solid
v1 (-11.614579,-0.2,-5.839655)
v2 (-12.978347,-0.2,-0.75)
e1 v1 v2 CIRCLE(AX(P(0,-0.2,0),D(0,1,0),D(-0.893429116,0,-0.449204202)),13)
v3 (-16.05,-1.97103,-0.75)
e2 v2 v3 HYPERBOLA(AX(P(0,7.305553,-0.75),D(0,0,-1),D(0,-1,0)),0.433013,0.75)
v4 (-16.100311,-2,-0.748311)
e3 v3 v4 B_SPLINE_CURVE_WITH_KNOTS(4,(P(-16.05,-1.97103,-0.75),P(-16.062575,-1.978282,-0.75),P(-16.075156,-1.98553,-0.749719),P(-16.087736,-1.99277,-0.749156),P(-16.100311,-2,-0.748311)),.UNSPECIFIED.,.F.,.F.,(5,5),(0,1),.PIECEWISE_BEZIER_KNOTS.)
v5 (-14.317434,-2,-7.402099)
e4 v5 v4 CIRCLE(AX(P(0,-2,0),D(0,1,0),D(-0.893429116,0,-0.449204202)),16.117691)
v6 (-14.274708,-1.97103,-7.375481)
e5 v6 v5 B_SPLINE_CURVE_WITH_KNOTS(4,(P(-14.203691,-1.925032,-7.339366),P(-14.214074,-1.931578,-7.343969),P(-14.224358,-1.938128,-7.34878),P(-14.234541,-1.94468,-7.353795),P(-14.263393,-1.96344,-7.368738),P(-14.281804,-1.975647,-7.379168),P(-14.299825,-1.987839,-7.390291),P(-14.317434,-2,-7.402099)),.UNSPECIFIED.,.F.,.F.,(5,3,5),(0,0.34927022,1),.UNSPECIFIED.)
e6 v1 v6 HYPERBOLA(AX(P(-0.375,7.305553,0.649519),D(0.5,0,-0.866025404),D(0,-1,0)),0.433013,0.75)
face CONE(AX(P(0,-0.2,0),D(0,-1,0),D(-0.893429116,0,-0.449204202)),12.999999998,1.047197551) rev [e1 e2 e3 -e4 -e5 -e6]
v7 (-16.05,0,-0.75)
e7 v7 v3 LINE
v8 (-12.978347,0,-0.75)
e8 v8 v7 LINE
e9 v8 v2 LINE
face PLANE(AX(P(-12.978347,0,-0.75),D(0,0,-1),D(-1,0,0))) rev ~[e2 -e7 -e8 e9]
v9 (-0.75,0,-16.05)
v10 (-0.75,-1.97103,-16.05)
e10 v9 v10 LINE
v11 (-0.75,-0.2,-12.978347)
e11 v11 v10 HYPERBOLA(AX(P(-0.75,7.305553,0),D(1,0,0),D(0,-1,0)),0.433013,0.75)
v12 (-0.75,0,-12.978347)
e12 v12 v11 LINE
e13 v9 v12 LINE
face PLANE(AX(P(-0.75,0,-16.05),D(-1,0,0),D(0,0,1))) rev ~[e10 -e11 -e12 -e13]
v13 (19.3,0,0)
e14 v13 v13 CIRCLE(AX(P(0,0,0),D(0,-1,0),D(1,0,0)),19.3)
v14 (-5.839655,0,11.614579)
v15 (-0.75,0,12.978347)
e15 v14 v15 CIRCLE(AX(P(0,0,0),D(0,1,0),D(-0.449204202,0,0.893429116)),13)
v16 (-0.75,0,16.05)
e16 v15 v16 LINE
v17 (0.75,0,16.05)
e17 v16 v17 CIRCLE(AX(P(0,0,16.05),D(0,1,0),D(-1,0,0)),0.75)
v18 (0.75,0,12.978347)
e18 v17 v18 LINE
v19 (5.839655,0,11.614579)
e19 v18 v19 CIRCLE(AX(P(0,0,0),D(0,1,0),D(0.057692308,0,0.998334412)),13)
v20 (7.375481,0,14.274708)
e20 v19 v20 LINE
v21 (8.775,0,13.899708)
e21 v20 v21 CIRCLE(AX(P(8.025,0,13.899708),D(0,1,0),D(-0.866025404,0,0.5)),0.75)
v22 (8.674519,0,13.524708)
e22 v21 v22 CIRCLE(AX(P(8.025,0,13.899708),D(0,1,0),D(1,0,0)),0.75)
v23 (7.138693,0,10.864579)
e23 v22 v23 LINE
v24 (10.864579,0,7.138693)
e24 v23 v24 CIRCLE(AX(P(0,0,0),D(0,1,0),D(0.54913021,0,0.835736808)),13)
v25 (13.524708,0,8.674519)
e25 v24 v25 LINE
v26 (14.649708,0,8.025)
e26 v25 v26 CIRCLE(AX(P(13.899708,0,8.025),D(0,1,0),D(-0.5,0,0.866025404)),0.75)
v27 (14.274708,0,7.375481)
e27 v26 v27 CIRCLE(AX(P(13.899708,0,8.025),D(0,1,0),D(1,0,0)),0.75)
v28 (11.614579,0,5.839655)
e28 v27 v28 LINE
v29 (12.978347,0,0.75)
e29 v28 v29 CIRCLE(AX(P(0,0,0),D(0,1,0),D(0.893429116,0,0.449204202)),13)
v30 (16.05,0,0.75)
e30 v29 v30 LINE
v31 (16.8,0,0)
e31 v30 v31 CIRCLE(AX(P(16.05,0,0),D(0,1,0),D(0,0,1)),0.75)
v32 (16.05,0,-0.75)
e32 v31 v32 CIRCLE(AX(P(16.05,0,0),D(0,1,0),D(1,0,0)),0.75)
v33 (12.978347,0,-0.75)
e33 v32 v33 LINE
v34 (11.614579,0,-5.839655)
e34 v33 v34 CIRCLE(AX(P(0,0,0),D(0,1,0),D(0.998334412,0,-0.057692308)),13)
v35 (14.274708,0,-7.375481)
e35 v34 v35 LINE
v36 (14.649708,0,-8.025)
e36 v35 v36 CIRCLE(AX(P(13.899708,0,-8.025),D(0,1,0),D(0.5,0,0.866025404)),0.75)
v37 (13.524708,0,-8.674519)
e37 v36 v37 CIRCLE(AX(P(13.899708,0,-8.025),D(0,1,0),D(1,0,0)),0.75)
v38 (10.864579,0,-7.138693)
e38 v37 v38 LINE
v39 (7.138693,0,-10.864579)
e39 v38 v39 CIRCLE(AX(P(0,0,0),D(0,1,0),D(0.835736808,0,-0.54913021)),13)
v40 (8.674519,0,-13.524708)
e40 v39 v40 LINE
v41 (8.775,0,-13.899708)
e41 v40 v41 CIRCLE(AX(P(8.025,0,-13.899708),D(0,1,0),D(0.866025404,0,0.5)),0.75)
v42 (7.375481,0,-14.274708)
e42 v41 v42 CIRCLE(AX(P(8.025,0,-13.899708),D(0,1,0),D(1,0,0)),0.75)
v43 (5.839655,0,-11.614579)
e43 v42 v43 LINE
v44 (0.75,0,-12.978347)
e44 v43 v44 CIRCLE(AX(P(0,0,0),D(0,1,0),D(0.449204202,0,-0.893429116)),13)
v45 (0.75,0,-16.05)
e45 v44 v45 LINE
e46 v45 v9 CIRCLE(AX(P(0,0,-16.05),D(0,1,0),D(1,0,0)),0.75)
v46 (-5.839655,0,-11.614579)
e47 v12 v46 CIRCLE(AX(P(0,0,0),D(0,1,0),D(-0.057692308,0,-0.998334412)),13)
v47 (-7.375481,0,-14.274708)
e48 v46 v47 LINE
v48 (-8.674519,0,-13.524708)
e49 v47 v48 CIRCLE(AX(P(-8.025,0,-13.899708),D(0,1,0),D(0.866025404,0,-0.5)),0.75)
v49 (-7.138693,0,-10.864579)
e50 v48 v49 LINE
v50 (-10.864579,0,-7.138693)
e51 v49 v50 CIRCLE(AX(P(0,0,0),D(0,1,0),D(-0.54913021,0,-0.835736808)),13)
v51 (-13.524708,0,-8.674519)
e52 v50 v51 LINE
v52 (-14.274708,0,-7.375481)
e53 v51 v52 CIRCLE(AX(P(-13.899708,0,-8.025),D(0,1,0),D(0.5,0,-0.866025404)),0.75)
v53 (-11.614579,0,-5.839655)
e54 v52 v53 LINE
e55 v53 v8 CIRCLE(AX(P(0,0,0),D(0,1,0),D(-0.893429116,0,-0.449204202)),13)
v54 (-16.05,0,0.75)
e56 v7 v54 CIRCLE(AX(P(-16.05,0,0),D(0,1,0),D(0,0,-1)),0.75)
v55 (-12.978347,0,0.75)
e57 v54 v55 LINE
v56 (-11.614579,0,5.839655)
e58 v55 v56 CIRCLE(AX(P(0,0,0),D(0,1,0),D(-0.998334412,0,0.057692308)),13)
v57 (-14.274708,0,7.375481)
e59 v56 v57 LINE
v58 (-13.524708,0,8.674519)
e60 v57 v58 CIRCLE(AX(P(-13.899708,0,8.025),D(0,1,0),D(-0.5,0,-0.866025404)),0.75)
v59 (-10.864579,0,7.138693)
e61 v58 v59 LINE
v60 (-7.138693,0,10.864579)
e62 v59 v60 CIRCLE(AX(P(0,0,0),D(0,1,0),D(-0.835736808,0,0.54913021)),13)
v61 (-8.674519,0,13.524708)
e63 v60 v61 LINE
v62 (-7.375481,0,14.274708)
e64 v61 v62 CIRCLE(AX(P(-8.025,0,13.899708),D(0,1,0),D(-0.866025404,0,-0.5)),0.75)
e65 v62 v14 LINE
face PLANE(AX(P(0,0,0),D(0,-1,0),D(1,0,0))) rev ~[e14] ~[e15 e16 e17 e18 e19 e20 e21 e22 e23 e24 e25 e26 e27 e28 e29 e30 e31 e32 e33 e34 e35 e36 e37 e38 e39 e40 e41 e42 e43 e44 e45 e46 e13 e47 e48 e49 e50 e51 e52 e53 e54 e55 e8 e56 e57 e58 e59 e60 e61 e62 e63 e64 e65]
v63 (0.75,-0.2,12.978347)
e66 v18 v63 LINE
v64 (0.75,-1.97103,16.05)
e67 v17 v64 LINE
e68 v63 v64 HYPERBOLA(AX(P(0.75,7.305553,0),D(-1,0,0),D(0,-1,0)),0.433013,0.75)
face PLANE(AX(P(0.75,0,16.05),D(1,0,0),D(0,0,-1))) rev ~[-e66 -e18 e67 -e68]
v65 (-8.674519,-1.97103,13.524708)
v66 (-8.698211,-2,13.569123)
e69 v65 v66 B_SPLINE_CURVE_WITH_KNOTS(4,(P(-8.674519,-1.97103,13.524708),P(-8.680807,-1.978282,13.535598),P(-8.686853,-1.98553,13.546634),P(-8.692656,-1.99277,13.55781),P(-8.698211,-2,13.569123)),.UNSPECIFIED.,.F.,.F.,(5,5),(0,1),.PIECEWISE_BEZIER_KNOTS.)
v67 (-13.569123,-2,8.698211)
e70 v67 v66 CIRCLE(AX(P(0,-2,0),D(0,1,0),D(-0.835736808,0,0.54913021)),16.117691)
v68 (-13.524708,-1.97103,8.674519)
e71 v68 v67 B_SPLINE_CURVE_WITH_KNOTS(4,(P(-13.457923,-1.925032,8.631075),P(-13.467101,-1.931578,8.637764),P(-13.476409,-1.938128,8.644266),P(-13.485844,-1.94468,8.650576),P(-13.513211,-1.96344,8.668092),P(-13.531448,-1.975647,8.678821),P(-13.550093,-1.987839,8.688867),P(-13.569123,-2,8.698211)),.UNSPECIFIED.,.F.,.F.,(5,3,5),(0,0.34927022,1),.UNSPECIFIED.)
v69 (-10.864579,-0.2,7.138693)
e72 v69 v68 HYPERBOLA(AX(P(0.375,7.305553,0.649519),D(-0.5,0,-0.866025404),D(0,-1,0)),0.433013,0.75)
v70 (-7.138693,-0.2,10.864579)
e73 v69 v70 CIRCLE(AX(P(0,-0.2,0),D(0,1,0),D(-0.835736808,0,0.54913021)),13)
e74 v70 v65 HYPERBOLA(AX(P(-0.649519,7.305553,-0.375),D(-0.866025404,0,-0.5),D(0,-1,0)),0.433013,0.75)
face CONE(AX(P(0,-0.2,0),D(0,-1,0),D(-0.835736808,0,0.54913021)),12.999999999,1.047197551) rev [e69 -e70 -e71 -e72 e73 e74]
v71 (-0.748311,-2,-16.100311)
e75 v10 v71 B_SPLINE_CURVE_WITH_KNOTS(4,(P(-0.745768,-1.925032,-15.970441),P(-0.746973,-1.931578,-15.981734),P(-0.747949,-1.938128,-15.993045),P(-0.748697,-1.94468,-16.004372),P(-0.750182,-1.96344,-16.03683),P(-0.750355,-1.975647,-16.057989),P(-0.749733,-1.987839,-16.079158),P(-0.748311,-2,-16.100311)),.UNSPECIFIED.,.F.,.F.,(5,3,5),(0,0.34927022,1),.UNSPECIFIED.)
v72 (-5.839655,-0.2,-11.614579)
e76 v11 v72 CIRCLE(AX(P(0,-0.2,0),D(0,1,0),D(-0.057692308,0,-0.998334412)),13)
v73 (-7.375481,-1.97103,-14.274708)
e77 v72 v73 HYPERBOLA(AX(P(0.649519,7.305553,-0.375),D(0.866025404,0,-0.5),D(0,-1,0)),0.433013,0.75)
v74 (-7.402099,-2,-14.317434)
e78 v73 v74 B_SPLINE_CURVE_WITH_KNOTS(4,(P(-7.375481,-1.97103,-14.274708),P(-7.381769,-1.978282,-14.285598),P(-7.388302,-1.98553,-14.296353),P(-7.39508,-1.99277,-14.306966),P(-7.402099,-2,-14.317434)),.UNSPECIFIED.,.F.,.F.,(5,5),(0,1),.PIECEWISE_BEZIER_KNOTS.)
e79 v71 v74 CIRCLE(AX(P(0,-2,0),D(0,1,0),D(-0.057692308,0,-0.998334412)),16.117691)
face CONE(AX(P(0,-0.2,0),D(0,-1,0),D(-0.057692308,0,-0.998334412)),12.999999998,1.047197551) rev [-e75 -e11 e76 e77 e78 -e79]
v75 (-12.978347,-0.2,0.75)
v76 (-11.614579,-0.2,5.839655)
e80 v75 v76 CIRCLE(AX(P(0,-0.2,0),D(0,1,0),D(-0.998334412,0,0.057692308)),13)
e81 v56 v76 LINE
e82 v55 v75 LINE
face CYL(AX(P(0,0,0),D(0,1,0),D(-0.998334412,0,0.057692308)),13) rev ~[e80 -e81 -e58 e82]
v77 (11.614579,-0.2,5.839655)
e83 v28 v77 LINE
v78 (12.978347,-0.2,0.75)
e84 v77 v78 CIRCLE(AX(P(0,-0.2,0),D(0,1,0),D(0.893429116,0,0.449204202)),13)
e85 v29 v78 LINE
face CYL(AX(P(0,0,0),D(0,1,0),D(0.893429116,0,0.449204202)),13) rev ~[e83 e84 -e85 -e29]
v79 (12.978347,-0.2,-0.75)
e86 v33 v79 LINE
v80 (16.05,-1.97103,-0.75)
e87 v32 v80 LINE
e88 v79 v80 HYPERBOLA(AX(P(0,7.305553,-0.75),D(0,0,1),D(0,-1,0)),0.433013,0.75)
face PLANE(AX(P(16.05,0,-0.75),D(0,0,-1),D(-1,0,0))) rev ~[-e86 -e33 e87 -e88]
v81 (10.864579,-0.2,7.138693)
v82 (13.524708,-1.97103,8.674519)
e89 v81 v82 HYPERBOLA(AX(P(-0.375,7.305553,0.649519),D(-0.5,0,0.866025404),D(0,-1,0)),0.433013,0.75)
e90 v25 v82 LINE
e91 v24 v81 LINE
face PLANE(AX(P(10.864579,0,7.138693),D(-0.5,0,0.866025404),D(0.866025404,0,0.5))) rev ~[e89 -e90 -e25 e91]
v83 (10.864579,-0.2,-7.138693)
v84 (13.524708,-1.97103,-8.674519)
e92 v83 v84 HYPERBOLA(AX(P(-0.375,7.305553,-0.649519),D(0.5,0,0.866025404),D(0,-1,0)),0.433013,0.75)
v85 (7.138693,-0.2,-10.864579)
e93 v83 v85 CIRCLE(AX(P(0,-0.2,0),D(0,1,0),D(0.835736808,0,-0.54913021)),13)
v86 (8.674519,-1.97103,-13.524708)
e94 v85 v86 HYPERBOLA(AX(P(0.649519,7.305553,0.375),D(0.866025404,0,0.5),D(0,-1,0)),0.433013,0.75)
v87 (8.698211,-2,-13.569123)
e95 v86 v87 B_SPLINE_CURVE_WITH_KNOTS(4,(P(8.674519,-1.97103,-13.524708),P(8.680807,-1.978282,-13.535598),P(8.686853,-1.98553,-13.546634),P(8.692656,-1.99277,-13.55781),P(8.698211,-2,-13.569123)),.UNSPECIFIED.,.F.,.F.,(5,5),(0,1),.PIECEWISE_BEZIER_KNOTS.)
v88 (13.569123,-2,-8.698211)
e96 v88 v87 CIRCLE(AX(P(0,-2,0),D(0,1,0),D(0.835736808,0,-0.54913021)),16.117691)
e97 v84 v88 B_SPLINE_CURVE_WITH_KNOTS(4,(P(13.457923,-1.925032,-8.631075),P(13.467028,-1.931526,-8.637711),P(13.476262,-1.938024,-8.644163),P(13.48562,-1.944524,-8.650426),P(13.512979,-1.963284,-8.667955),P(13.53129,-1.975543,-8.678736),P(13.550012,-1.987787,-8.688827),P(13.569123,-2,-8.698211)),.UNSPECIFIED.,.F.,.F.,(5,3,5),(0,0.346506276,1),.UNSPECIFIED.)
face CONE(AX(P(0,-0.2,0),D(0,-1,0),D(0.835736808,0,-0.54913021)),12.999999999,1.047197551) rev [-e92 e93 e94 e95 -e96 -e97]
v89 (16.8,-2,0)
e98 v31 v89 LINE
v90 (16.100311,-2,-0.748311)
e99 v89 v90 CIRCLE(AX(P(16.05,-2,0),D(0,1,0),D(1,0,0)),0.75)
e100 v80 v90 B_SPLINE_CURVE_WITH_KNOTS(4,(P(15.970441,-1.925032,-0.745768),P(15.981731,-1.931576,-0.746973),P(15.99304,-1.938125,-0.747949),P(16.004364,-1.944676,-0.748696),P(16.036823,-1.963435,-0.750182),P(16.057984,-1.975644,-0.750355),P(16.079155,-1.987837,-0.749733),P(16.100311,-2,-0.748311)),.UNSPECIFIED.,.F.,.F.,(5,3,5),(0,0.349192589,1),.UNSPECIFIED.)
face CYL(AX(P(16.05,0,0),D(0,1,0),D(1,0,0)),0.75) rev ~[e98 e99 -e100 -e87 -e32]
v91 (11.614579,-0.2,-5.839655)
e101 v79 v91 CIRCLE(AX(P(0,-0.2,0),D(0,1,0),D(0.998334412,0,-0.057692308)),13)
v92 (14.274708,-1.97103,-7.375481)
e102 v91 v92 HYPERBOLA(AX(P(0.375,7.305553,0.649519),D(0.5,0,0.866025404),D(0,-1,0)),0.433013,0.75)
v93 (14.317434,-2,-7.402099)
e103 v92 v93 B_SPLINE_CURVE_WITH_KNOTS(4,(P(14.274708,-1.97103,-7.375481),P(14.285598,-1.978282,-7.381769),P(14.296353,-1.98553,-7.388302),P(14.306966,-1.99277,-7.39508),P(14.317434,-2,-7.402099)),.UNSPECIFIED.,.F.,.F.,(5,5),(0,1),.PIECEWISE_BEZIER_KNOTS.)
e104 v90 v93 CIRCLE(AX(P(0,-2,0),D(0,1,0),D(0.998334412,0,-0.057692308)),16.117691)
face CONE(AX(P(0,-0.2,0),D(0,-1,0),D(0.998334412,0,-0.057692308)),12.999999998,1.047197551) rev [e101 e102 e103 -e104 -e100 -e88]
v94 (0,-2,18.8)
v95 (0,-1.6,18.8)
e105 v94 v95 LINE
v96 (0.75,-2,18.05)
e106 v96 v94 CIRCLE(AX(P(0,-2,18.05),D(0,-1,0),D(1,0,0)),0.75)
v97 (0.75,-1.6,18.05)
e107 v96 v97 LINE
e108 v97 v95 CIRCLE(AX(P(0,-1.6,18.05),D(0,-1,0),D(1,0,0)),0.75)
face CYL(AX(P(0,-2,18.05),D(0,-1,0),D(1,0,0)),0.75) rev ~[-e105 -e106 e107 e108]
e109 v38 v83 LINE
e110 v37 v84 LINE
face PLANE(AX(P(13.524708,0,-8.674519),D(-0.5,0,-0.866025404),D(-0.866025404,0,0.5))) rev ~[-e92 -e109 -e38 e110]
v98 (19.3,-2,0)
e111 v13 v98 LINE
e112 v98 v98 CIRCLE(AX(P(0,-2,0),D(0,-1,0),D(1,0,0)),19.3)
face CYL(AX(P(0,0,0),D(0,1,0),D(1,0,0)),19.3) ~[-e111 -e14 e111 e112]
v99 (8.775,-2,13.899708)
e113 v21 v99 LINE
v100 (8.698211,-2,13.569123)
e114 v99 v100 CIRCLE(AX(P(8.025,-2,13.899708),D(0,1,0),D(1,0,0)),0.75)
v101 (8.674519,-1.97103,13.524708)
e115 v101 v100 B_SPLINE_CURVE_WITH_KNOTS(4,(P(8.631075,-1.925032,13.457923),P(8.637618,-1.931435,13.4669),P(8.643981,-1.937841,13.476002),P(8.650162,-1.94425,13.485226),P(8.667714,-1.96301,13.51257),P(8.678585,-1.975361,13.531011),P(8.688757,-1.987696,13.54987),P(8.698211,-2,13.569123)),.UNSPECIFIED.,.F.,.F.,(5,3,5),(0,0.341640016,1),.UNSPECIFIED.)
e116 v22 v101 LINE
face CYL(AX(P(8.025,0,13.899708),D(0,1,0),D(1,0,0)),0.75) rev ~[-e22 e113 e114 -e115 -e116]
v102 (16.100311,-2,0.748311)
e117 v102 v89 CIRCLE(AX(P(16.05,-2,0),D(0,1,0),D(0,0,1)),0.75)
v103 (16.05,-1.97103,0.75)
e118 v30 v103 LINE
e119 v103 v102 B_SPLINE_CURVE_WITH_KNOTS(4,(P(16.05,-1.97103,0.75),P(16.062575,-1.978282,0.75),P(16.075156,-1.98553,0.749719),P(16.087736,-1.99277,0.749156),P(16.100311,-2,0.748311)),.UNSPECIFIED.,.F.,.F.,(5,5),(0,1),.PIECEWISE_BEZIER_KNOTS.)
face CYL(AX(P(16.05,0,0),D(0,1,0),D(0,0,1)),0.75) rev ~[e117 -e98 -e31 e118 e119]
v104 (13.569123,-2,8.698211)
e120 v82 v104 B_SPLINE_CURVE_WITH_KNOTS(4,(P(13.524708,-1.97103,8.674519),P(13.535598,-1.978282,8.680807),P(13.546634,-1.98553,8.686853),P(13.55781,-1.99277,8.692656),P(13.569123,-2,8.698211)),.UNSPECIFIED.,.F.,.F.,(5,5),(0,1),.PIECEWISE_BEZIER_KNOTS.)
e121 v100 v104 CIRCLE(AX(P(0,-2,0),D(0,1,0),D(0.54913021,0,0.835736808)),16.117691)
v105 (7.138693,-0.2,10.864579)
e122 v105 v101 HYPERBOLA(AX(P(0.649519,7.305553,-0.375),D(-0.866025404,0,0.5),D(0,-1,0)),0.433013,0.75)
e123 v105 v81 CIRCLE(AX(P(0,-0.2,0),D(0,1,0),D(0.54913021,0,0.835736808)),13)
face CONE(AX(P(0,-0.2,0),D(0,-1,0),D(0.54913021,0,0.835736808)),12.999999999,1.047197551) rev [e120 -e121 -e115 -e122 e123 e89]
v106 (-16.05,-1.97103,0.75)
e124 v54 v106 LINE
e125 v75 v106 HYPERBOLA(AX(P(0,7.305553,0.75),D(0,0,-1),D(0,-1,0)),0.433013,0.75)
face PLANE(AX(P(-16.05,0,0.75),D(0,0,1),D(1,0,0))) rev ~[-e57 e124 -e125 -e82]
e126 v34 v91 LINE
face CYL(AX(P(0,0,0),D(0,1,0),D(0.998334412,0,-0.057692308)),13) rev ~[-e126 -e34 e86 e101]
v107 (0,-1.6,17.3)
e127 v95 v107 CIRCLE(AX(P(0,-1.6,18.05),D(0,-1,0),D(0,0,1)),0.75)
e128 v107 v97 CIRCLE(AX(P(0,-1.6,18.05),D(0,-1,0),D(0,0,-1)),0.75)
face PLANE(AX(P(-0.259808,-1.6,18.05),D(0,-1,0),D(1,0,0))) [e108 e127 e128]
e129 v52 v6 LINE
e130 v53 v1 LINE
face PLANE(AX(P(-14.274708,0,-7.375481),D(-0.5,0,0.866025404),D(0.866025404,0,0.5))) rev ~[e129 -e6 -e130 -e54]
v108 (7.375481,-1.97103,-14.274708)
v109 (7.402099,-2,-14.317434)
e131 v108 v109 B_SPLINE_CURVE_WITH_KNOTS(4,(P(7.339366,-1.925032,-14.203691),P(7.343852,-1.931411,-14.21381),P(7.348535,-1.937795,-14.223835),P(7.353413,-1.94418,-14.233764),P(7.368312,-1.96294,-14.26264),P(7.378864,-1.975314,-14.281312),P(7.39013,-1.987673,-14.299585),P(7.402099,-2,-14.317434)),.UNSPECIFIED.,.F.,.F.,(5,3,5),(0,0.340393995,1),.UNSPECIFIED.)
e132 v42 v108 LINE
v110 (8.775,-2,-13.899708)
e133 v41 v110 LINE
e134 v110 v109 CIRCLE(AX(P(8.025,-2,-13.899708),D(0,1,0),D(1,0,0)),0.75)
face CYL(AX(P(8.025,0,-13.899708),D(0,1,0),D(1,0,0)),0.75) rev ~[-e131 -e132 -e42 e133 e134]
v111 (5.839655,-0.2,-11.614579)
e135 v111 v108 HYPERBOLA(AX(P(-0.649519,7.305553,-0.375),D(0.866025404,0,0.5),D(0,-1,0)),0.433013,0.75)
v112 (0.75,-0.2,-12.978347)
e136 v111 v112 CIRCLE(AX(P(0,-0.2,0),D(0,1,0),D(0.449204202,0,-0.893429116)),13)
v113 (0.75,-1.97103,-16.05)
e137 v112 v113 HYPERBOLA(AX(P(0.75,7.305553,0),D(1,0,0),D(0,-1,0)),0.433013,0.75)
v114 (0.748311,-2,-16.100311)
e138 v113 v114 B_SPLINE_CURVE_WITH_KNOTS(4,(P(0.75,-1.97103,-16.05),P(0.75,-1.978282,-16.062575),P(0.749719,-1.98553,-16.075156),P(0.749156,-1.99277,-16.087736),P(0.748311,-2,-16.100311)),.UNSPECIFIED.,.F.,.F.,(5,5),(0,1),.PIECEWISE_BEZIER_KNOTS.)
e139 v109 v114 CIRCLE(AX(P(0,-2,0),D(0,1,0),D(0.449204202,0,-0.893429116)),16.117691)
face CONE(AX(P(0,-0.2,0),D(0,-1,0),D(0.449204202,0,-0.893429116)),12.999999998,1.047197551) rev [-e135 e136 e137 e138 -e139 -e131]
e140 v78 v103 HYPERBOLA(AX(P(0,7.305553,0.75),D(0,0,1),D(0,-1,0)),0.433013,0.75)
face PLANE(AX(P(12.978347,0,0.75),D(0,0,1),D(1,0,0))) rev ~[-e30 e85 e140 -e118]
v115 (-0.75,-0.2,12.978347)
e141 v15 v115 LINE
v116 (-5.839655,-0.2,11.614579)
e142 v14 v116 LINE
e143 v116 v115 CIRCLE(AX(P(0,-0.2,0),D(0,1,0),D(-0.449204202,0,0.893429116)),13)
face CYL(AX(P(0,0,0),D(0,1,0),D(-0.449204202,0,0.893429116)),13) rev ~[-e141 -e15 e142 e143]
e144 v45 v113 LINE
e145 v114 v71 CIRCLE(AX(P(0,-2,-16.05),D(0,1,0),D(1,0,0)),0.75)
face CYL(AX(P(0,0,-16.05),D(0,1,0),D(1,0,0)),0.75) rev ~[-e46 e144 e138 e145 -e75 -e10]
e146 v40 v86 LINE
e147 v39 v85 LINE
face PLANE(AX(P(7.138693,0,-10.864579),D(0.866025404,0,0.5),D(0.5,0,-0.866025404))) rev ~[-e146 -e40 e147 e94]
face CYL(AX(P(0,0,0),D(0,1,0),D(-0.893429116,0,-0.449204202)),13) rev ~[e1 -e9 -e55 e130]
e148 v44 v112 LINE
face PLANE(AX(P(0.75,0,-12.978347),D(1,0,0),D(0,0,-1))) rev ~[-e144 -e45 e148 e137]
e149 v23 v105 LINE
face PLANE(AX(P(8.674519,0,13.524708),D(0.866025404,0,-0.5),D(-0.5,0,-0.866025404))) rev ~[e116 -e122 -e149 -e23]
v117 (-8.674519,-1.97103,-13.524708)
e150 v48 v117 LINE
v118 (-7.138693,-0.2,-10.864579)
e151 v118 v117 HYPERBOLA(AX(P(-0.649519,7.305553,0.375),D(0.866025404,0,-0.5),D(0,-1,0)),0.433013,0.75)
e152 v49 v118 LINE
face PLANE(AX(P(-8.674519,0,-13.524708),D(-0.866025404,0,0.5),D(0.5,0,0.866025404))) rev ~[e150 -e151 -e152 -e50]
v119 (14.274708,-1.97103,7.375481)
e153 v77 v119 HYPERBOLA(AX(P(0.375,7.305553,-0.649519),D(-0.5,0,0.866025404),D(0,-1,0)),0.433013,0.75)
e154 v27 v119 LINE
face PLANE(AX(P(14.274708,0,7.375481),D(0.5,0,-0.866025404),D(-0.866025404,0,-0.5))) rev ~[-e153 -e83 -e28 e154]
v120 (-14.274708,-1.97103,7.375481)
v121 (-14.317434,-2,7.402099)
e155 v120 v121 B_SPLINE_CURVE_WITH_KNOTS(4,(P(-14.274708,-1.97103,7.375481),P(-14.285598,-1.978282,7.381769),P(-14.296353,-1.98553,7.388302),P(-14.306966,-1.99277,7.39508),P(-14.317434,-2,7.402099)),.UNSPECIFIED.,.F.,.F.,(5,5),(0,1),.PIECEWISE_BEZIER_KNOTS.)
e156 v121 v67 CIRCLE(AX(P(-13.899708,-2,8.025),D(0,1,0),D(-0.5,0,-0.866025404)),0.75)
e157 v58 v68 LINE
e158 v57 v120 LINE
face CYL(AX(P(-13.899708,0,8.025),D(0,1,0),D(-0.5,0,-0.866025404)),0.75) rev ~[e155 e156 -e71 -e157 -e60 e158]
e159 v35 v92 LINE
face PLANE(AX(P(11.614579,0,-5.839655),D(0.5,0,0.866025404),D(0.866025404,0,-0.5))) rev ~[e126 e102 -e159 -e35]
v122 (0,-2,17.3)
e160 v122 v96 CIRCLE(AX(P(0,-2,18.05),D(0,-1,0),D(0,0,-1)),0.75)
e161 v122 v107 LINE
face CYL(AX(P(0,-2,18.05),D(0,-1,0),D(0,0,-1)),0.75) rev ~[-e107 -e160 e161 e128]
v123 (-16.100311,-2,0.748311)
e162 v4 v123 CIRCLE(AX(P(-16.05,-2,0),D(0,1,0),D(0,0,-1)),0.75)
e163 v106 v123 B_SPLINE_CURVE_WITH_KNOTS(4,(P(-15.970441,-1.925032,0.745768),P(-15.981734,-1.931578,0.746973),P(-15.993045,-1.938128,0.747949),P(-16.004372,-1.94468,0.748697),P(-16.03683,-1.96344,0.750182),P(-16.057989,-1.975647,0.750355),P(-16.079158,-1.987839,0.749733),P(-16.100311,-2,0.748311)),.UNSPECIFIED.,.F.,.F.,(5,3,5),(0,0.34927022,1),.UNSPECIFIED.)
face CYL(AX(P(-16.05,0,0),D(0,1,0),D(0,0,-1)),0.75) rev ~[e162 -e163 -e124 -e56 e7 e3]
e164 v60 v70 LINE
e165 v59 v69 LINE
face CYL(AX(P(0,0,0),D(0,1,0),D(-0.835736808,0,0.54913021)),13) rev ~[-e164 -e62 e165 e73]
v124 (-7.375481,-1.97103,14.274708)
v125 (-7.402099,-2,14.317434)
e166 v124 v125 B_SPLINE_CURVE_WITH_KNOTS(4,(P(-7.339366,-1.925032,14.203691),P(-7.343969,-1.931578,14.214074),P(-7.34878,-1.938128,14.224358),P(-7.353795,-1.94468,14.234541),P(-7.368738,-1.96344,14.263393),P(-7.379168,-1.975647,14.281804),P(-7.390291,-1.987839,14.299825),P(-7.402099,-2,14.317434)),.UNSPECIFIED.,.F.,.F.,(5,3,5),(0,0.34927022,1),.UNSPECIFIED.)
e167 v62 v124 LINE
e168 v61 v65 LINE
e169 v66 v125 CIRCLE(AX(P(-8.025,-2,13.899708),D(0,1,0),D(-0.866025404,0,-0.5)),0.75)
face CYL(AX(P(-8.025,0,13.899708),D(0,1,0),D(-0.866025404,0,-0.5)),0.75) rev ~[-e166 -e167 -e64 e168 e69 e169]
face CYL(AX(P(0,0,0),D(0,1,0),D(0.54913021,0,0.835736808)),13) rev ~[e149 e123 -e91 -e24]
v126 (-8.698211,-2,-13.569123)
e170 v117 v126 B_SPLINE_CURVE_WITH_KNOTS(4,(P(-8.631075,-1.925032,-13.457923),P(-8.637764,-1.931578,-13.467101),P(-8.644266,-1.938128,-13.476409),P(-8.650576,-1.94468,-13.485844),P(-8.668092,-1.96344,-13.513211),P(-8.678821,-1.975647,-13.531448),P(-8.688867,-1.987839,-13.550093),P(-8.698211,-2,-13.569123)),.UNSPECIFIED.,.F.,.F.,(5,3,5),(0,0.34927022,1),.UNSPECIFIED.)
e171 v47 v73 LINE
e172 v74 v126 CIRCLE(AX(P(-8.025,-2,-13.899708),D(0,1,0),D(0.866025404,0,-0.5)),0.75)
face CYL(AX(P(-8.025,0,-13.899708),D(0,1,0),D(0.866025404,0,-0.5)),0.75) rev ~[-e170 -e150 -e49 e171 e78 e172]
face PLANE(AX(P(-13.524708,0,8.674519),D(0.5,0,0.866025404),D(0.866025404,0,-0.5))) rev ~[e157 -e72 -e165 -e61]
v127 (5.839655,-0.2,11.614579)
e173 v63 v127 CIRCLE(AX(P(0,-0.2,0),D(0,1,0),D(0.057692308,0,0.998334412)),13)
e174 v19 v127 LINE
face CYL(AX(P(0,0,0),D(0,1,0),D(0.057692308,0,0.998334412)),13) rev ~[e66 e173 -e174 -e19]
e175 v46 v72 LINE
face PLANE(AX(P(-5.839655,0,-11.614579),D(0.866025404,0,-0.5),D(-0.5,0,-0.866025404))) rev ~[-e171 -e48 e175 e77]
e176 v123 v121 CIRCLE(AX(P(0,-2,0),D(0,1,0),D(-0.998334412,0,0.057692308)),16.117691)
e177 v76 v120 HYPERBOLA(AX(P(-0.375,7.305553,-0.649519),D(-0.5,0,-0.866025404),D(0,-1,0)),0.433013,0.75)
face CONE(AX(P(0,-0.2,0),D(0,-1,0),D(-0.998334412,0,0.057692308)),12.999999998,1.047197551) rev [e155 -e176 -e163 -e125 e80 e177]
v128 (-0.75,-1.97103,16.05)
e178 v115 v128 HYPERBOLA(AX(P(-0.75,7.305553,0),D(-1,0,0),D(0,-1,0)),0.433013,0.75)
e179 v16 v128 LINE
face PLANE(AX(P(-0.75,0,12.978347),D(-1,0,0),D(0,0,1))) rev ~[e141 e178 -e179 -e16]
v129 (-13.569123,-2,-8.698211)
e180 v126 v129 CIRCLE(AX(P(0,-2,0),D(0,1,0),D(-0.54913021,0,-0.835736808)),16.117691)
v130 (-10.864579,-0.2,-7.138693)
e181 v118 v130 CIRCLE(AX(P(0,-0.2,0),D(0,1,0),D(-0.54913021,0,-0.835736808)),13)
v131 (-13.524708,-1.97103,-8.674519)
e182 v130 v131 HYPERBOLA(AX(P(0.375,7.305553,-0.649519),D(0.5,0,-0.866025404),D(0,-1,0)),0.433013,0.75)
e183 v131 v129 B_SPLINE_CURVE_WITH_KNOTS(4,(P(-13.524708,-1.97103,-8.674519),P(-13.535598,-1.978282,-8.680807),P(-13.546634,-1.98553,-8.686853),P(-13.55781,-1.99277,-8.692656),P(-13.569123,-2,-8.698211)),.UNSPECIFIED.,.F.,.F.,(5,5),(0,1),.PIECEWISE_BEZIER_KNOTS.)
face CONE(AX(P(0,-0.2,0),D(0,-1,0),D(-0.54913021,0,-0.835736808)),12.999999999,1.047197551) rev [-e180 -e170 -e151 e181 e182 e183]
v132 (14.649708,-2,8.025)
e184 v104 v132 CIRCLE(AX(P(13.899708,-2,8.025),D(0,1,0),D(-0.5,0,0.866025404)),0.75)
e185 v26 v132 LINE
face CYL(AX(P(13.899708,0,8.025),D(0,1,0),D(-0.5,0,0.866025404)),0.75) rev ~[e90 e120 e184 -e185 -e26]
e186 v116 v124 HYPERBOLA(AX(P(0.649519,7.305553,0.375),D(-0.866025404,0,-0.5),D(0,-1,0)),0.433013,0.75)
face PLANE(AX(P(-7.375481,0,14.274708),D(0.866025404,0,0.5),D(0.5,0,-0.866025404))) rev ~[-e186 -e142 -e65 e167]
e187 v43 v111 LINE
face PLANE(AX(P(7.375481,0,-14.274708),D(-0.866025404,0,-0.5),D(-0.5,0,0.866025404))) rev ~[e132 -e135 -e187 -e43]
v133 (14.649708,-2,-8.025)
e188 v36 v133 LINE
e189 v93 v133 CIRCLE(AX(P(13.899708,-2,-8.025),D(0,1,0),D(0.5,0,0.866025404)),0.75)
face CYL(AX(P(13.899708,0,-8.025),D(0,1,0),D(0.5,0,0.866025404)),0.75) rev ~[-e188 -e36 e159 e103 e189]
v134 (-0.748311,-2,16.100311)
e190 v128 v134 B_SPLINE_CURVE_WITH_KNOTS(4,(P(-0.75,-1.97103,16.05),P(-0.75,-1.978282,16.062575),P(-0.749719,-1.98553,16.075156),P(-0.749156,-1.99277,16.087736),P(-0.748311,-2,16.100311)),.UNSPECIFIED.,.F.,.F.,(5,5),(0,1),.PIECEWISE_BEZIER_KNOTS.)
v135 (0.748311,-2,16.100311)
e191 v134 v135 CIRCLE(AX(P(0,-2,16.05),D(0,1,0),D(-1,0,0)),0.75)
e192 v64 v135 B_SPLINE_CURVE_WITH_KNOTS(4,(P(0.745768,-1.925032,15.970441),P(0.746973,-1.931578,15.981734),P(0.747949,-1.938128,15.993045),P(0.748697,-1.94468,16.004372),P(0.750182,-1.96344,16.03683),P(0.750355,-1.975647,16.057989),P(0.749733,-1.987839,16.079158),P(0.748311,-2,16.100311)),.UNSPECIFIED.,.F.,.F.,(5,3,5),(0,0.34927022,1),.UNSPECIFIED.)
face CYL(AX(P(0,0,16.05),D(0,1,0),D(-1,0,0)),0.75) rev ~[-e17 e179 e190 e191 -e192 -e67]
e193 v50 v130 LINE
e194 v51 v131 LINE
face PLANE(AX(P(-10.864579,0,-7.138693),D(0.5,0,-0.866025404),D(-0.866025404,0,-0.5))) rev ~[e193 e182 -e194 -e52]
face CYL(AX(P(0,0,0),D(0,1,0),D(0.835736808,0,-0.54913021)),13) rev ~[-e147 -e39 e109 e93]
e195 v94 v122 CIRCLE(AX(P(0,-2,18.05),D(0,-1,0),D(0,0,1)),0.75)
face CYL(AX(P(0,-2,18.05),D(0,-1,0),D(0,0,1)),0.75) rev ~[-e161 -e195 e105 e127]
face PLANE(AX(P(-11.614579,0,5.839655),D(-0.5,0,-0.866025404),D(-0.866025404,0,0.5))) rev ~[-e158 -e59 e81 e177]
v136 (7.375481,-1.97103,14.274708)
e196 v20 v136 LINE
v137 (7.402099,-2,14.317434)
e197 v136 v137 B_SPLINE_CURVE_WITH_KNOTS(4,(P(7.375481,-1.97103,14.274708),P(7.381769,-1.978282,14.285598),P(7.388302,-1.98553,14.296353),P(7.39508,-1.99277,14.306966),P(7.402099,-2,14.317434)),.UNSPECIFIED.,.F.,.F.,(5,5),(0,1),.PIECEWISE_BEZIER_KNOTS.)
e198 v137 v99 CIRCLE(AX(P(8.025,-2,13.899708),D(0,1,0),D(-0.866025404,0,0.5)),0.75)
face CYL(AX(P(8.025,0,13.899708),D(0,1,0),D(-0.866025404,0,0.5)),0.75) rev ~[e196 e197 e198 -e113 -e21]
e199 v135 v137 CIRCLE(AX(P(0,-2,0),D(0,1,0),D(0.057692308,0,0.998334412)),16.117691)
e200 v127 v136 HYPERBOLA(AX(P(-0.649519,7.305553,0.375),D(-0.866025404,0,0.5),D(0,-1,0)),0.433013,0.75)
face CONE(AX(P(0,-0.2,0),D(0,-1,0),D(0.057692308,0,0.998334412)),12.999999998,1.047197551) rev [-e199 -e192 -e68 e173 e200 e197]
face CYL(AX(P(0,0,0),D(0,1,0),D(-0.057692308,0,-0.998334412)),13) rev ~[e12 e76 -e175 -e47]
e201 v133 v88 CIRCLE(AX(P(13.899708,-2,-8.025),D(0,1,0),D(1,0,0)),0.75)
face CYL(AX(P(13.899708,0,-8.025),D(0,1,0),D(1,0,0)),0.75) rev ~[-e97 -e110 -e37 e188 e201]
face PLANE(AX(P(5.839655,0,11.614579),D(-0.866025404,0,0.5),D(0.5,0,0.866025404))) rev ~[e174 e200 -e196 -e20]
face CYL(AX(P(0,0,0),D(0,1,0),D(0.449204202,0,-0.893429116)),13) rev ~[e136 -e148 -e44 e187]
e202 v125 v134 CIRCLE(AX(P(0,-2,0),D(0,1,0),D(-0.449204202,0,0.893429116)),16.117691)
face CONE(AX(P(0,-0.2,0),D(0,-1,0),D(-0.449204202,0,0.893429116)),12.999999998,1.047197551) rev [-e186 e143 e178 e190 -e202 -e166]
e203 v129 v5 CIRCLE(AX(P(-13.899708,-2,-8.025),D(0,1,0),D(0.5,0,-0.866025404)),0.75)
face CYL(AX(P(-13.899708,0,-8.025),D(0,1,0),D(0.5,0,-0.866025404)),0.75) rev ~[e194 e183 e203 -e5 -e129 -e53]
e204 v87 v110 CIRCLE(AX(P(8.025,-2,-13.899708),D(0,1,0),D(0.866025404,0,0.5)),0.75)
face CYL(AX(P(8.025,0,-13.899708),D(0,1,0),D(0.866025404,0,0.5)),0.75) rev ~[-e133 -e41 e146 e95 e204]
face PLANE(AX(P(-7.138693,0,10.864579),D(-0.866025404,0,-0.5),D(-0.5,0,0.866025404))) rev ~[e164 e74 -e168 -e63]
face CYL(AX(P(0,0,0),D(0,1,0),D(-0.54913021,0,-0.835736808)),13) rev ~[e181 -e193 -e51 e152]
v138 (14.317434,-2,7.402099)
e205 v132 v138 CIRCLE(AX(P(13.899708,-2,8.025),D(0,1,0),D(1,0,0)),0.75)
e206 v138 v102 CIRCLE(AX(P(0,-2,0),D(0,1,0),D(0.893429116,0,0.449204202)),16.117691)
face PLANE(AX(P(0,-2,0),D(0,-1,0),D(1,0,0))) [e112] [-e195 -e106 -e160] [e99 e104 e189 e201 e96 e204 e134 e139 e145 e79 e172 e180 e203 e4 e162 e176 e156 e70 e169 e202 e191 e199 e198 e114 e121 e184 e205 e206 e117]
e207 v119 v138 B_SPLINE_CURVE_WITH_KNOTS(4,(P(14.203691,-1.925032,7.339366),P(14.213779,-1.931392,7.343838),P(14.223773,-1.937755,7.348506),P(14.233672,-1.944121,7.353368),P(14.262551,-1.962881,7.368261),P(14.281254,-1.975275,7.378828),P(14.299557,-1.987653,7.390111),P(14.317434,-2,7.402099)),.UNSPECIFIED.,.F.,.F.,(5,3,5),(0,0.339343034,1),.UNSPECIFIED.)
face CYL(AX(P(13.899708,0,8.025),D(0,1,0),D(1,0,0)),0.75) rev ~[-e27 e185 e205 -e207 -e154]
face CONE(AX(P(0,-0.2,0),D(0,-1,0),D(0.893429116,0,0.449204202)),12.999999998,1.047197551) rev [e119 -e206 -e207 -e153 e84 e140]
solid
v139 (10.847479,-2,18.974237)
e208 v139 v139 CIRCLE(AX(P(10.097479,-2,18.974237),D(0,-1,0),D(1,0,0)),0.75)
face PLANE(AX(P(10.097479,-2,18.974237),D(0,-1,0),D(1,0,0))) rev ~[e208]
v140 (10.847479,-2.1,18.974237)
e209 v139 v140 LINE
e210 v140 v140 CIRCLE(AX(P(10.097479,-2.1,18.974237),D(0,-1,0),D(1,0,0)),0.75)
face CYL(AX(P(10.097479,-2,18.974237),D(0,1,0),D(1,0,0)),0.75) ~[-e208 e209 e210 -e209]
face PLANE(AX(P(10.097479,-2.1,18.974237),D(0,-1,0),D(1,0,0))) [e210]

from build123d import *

# Parameters (mm, degrees)
F0_R        = 19.3
F1_DEPTH    = 2
F2_SIZE2    = 3.1176914536
F2_SIZE     = 1.8
F2_2_SIZE2  = 3.1176914536
F2_2_SIZE   = 1.8
F2_3_SIZE2  = 3.1176914536
F2_3_SIZE   = 1.8
F2_4_SIZE2  = 3.1176914536
F2_4_SIZE   = 1.8
F2_5_SIZE2  = 3.1176914536
F2_5_SIZE   = 1.8
F2_6_SIZE2  = 3.1176914536
F2_6_SIZE   = 1.8
F2_7_SIZE2  = 3.1176914536
F2_7_SIZE   = 1.8
F2_8_SIZE2  = 3.1176914536
F2_8_SIZE   = 1.8
F2_9_SIZE2  = 3.1176914536
F2_9_SIZE   = 1.8
F2_10_SIZE2 = 3.1176914536
F2_10_SIZE  = 1.8
F2_11_SIZE2 = 3.1176914536
F2_11_SIZE  = 1.8
F2_12_SIZE2 = 3.1176914536
F2_12_SIZE  = 1.8
F4_DEPTH    = 0.4
F3_R        = 0.75
F5_DEPTH    = 0.1


# Not quite as in the source:
# - a feature names something its author has since deleted; it is built from what else it names


with BuildPart() as f1:
    # F0 (on Front) → F1 (new body)
    with BuildSketch(Plane.XZ):
        Circle(F0_R)
        with BuildLine():
            ThreePointArc((-16.05, -0.75), (-16.8, 0), (-16.05, 0.75))
            Line((-16.05, 0.75), (-12.9783473524, 0.75))
            ThreePointArc((-12.9783473524, 0.75), (-12.5570357418, 3.3646475863), (-11.6145785063, 5.8396546234))
            Line((-11.6145785063, 5.8396546234), (-14.2747077307, 7.3754809472))
            ThreePointArc((-14.2747077307, 7.3754809472), (-14.5492267836, 8.4), (-13.5247077307, 8.6745190528))
            Line((-13.5247077307, 8.6745190528), (-10.8645785063, 7.138692729))
            ThreePointArc((-10.8645785063, 7.138692729), (-9.1923881554, 9.1923881554), (-7.138692729, 10.8645785063))
            Line((-7.138692729, 10.8645785063), (-8.6745190528, 13.5247077307))
            ThreePointArc((-8.6745190528, 13.5247077307), (-8.4, 14.5492267836), (-7.3754809472, 14.2747077307))
            Line((-7.3754809472, 14.2747077307), (-5.8396546234, 11.6145785063))
            ThreePointArc((-5.8396546234, 11.6145785063), (-3.3646475863, 12.5570357418), (-0.75, 12.9783473524))
            Line((-0.75, 12.9783473524), (-0.75, 16.05))
            ThreePointArc((-0.75, 16.05), (0, 16.8), (0.75, 16.05))
            Line((0.75, 16.05), (0.75, 12.9783473524))
            ThreePointArc((0.75, 12.9783473524), (3.3646475863, 12.5570357418), (5.8396546234, 11.6145785063))
            Line((5.8396546234, 11.6145785063), (7.3754809472, 14.2747077307))
            ThreePointArc((7.3754809472, 14.2747077307), (8.2191142838, 14.6241521005), (8.775, 13.8997077307))
            ThreePointArc((8.775, 13.8997077307), (8.7494443697, 13.7055934469), (8.6745190528, 13.5247077307))
            Line((8.6745190528, 13.5247077307), (7.138692729, 10.8645785063))
            ThreePointArc((7.138692729, 10.8645785063), (9.1923881554, 9.1923881554), (10.8645785063, 7.138692729))
            Line((10.8645785063, 7.138692729), (13.5247077307, 8.6745190528))
            ThreePointArc((13.5247077307, 8.6745190528), (14.2747077307, 8.6745190528), (14.6497077307, 8.025))
            ThreePointArc((14.6497077307, 8.025), (14.5492267836, 7.65), (14.2747077307, 7.3754809472))
            Line((14.2747077307, 7.3754809472), (11.6145785063, 5.8396546234))
            ThreePointArc((11.6145785063, 5.8396546234), (12.5570357418, 3.3646475863), (12.9783473524, 0.75))
            Line((12.9783473524, 0.75), (16.05, 0.75))
            ThreePointArc((16.05, 0.75), (16.5803300859, 0.5303300859), (16.8, 0))
            ThreePointArc((16.8, 0), (16.5803300859, -0.5303300859), (16.05, -0.75))
            Line((16.05, -0.75), (12.9783473524, -0.75))
            ThreePointArc((12.9783473524, -0.75), (12.5570357418, -3.3646475863), (11.6145785063, -5.8396546234))
            Line((11.6145785063, -5.8396546234), (14.2747077307, -7.3754809472))
            ThreePointArc((14.2747077307, -7.3754809472), (14.5492267836, -7.65), (14.6497077307, -8.025))
            ThreePointArc((14.6497077307, -8.025), (14.2747077307, -8.6745190528), (13.5247077307, -8.6745190528))
            Line((13.5247077307, -8.6745190528), (10.8645785063, -7.138692729))
            ThreePointArc((10.8645785063, -7.138692729), (9.1923881554, -9.1923881554), (7.138692729, -10.8645785063))
            Line((7.138692729, -10.8645785063), (8.6745190528, -13.5247077307))
            ThreePointArc((8.6745190528, -13.5247077307), (8.7494443697, -13.7055934469), (8.775, -13.8997077307))
            ThreePointArc((8.775, -13.8997077307), (8.2191142838, -14.6241521005), (7.3754809472, -14.2747077307))
            Line((7.3754809472, -14.2747077307), (5.8396546234, -11.6145785063))
            ThreePointArc((5.8396546234, -11.6145785063), (3.3646475863, -12.5570357418), (0.75, -12.9783473524))
            Line((0.75, -12.9783473524), (0.75, -16.05))
            ThreePointArc((0.75, -16.05), (0, -16.8), (-0.75, -16.05))
            Line((-0.75, -16.05), (-0.75, -12.9783473524))
            ThreePointArc((-0.75, -12.9783473524), (-3.3646475863, -12.5570357418), (-5.8396546234, -11.6145785063))
            Line((-5.8396546234, -11.6145785063), (-7.3754809472, -14.2747077307))
            ThreePointArc((-7.3754809472, -14.2747077307), (-8.4, -14.5492267836), (-8.6745190528, -13.5247077307))
            Line((-8.6745190528, -13.5247077307), (-7.138692729, -10.8645785063))
            ThreePointArc((-7.138692729, -10.8645785063), (-9.1923881554, -9.1923881554), (-10.8645785063, -7.138692729))
            Line((-10.8645785063, -7.138692729), (-13.5247077307, -8.6745190528))
            ThreePointArc((-13.5247077307, -8.6745190528), (-14.5492267836, -8.4), (-14.2747077307, -7.3754809472))
            Line((-14.2747077307, -7.3754809472), (-11.6145785063, -5.8396546234))
            ThreePointArc((-11.6145785063, -5.8396546234), (-12.5570357418, -3.3646475863), (-12.9783473524, -0.75))
            Line((-12.9783473524, -0.75), (-16.05, -0.75))
        make_face(mode=Mode.SUBTRACT)
    extrude(amount=F1_DEPTH)

    # F2
    f2_edges = [f1.edges().sort_by_distance(p)[0] for p in [
        (-9.192388, -2, 9.192388),
    ]]
    f2_side = f1.faces().sort_by_distance((-9.192388, -1, 9.192388))[0]
    chamfer(f2_edges, length=F2_SIZE, length2=F2_SIZE2, reference=f2_side)

    # F2#2
    f2_2_edges = [f1.edges().sort_by_distance(p)[0] for p in [
        (-3.364648, -2, 12.557036),
    ]]
    f2_2_side = f1.faces().sort_by_distance((-3.364648, -1, 12.557036))[0]
    chamfer(f2_2_edges, length=F2_2_SIZE, length2=F2_2_SIZE2, reference=f2_2_side)

    # F2#3
    f2_3_edges = [f1.edges().sort_by_distance(p)[0] for p in [
        (3.364648, -2, 12.557036),
    ]]
    f2_3_side = f1.faces().sort_by_distance((3.364648, -1, 12.557036))[0]
    chamfer(f2_3_edges, length=F2_3_SIZE, length2=F2_3_SIZE2, reference=f2_3_side)

    # F2#4
    f2_4_edges = [f1.edges().sort_by_distance(p)[0] for p in [
        (9.192388, -2, 9.192388),
    ]]
    f2_4_side = f1.faces().sort_by_distance((9.192388, -1, 9.192388))[0]
    chamfer(f2_4_edges, length=F2_4_SIZE, length2=F2_4_SIZE2, reference=f2_4_side)

    # F2#5
    f2_5_edges = [f1.edges().sort_by_distance(p)[0] for p in [
        (12.557036, -2, 3.364648),
    ]]
    f2_5_side = f1.faces().sort_by_distance((12.557036, -1, 3.364648))[0]
    chamfer(f2_5_edges, length=F2_5_SIZE, length2=F2_5_SIZE2, reference=f2_5_side)

    # F2#6
    f2_6_edges = [f1.edges().sort_by_distance(p)[0] for p in [
        (-12.557036, -2, 3.364648),
    ]]
    f2_6_side = f1.faces().sort_by_distance((-12.557036, -1, 3.364648))[0]
    chamfer(f2_6_edges, length=F2_6_SIZE, length2=F2_6_SIZE2, reference=f2_6_side)

    # F2#7
    f2_7_edges = [f1.edges().sort_by_distance(p)[0] for p in [
        (-12.557036, -2, -3.364648),
    ]]
    f2_7_side = f1.faces().sort_by_distance((-12.557036, -1, -3.364648))[0]
    chamfer(f2_7_edges, length=F2_7_SIZE, length2=F2_7_SIZE2, reference=f2_7_side)

    # F2#8
    f2_8_edges = [f1.edges().sort_by_distance(p)[0] for p in [
        (-9.192388, -2, -9.192388),
    ]]
    f2_8_side = f1.faces().sort_by_distance((-9.192388, -1, -9.192388))[0]
    chamfer(f2_8_edges, length=F2_8_SIZE, length2=F2_8_SIZE2, reference=f2_8_side)

    # F2#9
    f2_9_edges = [f1.edges().sort_by_distance(p)[0] for p in [
        (-3.364648, -2, -12.557036),
    ]]
    f2_9_side = f1.faces().sort_by_distance((-3.364648, -1, -12.557036))[0]
    chamfer(f2_9_edges, length=F2_9_SIZE, length2=F2_9_SIZE2, reference=f2_9_side)

    # F2#10
    f2_10_edges = [f1.edges().sort_by_distance(p)[0] for p in [
        (3.364648, -2, -12.557036),
    ]]
    f2_10_side = f1.faces().sort_by_distance((3.364648, -1, -12.557036))[0]
    chamfer(f2_10_edges, length=F2_10_SIZE, length2=F2_10_SIZE2, reference=f2_10_side)

    # F2#11
    f2_11_edges = [f1.edges().sort_by_distance(p)[0] for p in [
        (9.192388, -2, -9.192388),
    ]]
    f2_11_side = f1.faces().sort_by_distance((9.192388, -1, -9.192388))[0]
    chamfer(f2_11_edges, length=F2_11_SIZE, length2=F2_11_SIZE2, reference=f2_11_side)

    # F2#12
    f2_12_edges = [f1.edges().sort_by_distance(p)[0] for p in [
        (12.557036, -2, -3.364648),
    ]]
    f2_12_side = f1.faces().sort_by_distance((12.557036, -1, -3.364648))[0]
    chamfer(f2_12_edges, length=F2_12_SIZE, length2=F2_12_SIZE2, reference=f2_12_side)

    # F3 (on face) → F4 (cut)
    with BuildSketch(Plane.XZ.offset(2)):
        with BuildLine():
            ThreePointArc((0, 18.8), (-0.75, 18.05), (0, 17.3))
            Line((0, 17.3), (0, 18.8))
        make_face()
        with BuildLine():
            Line((0, 18.8), (0, 17.3))
            ThreePointArc((0, 17.3), (0.5303300859, 17.5196699141), (0.75, 18.05))
            ThreePointArc((0.75, 18.05), (0.5303300859, 18.5803300859), (0, 18.8))
        make_face()
    extrude(amount=-F4_DEPTH, mode=Mode.SUBTRACT)


with BuildPart() as f5:
    # F3 (on face) → F5 (new body)
    with BuildSketch(Plane.XZ.offset(2)):
        with Locations((10.0974785164, 18.974237144)):
            Circle(F3_R)
    extrude(amount=F5_DEPTH)


solid = Compound([f1.part, f5.part])
